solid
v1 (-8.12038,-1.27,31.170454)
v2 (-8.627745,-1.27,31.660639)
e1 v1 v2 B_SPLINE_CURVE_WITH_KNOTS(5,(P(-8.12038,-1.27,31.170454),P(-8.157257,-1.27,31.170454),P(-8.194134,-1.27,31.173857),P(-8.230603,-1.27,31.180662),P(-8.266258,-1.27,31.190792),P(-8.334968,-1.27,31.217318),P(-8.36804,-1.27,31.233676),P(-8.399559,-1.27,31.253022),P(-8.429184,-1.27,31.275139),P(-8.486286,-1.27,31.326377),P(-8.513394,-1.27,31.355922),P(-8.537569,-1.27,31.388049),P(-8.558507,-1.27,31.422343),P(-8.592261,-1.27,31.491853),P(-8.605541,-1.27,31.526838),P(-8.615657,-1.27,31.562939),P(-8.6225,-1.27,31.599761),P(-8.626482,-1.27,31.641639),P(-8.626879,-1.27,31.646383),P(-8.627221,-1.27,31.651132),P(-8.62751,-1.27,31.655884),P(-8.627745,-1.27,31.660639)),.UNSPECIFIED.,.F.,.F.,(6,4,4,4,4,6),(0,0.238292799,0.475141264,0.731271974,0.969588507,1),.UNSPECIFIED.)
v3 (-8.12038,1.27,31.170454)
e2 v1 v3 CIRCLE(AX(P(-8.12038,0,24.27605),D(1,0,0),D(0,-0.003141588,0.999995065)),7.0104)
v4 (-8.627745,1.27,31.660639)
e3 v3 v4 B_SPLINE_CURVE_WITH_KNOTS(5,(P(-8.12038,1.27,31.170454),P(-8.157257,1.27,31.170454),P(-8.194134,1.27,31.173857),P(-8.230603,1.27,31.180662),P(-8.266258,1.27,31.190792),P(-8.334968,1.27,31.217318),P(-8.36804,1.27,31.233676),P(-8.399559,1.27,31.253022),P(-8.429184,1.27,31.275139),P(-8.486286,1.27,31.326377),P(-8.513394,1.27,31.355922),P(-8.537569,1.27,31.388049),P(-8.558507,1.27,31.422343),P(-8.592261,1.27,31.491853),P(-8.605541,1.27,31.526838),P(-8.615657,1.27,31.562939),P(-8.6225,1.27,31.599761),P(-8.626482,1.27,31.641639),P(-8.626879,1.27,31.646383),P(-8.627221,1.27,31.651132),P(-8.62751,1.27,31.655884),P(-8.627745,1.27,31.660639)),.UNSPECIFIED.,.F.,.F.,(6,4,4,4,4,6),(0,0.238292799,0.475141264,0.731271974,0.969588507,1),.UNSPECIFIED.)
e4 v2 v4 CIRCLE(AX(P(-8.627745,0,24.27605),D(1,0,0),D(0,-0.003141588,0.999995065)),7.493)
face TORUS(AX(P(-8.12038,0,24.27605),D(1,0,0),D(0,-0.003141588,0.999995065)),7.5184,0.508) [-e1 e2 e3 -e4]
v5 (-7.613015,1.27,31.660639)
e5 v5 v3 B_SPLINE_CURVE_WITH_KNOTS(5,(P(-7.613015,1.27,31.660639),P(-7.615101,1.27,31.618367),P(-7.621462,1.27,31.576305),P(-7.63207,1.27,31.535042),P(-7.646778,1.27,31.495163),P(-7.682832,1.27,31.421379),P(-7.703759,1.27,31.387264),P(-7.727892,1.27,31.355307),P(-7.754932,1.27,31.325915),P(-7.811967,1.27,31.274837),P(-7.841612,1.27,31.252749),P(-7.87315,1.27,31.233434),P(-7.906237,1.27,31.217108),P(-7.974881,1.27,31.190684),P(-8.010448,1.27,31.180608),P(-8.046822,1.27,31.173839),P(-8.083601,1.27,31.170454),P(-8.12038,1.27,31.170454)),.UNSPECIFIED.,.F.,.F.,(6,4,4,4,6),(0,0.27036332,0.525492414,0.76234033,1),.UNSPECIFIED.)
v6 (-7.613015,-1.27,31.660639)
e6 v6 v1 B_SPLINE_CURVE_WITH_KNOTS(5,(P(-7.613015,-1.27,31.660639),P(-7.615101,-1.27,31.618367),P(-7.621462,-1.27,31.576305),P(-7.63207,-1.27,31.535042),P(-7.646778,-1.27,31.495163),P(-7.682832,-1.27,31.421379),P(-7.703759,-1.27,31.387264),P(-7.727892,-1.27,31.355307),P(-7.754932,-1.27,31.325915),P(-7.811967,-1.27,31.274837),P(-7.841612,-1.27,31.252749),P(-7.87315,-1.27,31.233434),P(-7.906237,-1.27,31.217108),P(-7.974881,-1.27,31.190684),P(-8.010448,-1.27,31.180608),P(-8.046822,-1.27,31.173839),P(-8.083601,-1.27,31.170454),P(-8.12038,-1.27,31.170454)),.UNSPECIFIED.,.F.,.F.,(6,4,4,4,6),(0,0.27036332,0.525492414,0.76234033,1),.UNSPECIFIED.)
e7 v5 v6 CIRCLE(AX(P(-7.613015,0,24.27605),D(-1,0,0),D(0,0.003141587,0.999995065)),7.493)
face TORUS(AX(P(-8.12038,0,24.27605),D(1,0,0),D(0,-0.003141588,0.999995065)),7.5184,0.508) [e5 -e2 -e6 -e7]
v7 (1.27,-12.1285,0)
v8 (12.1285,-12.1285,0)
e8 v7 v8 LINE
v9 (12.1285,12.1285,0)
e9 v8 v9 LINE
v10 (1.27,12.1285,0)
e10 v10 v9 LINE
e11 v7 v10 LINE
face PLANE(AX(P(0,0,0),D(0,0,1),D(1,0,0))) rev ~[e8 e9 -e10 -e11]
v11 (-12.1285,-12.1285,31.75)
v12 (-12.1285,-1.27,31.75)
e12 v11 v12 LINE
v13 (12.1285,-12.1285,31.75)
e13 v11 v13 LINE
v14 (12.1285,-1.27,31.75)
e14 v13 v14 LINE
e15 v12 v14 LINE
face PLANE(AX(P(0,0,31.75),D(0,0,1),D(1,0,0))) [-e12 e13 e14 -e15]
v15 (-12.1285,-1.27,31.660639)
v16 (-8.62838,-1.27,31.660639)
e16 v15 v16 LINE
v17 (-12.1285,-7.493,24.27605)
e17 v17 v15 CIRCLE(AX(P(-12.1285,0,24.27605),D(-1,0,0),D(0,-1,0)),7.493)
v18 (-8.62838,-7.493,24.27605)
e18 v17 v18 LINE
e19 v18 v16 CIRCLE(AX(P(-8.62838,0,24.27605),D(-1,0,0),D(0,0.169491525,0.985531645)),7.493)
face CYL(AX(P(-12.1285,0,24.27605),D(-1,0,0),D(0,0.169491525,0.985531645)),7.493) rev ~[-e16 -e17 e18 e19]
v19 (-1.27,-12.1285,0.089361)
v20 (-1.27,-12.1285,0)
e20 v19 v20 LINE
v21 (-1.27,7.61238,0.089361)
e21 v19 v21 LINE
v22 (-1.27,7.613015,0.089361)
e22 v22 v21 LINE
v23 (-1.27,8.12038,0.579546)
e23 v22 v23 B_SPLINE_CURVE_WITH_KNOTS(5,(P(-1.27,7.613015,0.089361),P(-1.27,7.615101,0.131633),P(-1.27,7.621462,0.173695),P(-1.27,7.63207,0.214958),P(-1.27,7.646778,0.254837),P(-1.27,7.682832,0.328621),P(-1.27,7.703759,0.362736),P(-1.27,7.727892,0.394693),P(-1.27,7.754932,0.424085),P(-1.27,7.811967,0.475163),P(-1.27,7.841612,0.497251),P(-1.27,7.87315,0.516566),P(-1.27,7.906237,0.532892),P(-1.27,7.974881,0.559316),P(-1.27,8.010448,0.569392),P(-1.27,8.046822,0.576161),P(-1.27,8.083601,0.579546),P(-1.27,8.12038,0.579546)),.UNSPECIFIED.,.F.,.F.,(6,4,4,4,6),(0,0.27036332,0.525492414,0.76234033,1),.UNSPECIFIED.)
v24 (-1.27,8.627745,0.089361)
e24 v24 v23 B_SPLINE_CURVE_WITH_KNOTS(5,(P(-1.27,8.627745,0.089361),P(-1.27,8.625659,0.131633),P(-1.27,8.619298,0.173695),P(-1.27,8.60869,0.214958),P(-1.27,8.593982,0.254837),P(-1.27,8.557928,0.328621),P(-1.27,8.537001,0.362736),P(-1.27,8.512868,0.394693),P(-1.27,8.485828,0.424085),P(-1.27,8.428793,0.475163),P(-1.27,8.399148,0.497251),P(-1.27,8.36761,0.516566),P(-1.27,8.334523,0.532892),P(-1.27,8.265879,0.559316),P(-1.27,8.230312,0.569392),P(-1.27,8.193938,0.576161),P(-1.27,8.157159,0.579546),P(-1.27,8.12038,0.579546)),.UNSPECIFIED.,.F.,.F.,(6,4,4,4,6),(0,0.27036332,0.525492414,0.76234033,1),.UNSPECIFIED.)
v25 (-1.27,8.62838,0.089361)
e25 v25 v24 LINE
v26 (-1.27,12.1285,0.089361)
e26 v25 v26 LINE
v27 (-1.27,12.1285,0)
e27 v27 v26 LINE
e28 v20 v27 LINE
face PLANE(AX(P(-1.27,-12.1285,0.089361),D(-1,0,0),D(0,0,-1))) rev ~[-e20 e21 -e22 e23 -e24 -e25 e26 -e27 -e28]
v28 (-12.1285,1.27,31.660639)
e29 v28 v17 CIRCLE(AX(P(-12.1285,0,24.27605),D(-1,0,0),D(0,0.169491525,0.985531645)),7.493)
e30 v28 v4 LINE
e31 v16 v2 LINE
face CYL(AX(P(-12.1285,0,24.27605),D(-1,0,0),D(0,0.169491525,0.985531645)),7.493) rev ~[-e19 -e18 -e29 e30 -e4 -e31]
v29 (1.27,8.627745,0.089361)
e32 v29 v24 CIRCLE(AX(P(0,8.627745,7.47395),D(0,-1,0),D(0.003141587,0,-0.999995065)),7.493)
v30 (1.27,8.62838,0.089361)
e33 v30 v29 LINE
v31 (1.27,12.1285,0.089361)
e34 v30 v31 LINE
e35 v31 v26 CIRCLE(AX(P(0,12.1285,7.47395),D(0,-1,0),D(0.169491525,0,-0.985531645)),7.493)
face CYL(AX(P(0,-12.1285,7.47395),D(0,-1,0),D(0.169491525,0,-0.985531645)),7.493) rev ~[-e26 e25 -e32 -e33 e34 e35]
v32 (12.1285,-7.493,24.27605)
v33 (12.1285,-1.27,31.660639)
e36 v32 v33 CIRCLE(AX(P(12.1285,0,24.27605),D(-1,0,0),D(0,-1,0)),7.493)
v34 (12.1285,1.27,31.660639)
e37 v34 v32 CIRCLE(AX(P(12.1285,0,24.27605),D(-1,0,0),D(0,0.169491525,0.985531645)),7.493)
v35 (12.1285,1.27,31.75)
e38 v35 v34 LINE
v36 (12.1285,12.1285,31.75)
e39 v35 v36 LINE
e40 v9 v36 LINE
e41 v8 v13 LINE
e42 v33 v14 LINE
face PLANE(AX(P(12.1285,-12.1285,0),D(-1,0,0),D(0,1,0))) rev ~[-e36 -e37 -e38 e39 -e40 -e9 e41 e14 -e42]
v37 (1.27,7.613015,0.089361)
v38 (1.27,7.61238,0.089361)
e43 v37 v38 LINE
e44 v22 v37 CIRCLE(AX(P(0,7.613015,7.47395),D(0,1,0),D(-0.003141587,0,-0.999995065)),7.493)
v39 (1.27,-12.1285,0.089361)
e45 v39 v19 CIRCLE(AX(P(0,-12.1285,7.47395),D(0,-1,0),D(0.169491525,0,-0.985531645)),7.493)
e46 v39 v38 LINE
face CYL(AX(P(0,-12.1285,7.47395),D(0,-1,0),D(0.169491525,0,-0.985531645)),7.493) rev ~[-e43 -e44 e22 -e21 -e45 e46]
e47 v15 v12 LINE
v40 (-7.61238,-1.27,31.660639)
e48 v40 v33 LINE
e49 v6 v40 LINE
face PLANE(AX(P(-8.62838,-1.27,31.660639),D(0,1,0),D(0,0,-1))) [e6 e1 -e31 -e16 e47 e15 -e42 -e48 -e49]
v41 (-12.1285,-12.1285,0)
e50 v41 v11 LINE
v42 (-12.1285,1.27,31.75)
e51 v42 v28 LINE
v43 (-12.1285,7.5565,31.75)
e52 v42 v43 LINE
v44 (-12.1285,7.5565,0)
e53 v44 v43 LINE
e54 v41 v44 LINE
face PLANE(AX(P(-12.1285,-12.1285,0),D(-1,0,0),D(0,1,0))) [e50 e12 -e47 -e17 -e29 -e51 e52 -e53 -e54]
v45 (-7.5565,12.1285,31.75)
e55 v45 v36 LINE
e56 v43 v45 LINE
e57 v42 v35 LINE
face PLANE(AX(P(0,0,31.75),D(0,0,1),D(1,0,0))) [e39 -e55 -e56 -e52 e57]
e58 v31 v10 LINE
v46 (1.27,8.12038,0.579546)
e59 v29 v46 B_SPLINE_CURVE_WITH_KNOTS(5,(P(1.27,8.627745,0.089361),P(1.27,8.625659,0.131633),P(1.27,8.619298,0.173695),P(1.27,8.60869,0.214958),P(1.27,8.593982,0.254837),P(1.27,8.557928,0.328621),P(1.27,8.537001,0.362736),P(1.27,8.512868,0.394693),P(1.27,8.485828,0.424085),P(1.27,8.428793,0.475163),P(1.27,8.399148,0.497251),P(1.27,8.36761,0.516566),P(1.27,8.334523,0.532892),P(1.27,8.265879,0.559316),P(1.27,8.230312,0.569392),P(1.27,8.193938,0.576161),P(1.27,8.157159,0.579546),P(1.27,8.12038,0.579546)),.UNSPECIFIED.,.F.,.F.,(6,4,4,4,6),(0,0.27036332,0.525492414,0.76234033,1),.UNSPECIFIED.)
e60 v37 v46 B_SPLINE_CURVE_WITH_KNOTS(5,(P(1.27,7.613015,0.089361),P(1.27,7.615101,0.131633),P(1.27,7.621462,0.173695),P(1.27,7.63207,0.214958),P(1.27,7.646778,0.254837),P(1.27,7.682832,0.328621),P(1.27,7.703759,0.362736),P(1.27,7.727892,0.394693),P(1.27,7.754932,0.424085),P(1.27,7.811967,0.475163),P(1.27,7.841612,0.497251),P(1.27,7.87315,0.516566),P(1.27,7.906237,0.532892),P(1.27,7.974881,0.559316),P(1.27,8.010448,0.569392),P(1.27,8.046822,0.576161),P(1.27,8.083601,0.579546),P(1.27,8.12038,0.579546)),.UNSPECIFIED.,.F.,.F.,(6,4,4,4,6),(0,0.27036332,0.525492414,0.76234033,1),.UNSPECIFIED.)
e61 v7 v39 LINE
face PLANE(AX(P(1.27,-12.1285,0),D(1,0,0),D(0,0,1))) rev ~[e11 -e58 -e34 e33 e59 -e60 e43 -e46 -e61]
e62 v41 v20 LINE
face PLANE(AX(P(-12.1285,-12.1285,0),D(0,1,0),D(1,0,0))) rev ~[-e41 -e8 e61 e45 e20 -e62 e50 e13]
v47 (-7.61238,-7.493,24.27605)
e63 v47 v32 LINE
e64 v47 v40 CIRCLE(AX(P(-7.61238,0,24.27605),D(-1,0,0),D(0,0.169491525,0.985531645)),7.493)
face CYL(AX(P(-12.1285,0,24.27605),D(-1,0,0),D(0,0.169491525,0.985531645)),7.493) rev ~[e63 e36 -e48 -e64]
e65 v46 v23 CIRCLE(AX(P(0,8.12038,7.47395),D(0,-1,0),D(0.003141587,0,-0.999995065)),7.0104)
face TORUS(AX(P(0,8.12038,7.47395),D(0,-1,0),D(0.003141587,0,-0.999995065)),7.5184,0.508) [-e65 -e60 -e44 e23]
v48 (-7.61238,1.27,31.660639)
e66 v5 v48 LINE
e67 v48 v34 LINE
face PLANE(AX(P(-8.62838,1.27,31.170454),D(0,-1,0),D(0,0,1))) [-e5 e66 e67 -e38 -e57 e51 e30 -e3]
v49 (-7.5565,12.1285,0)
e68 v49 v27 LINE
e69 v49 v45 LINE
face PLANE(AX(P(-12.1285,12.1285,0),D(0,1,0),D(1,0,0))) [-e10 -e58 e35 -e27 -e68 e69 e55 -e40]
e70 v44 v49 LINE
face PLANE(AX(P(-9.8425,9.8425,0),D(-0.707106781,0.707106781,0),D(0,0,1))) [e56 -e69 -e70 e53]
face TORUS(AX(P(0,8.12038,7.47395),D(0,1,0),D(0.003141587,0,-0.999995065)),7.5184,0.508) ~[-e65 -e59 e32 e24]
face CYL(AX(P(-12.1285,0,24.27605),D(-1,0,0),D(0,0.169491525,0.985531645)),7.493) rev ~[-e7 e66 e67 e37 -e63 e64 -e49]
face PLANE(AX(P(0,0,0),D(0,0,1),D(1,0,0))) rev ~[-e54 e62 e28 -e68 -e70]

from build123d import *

# Parameters (mm, degrees)
F0_W          = 24.257
F0_H          = 24.257
F1_DEPTH      = 31.75
F3_DEPTH      = 25.4
F5_DEPTH      = 25.4
F9_DEPTH      = 1.016
F11_DEPTH     = 1.016
F12_T4_ANGLE  = 359.64
F12_S5_R      = 7.493
F12_T6_DEPTH  = 13
F12_T10_ANGLE = 359.64
F12_S11_R     = 7.493
F12_T12_DEPTH = 13
F12_T16_ANGLE = 359.64
F12_S17_R     = 7.493
F12_T18_DEPTH = 14
F12_T22_ANGLE = 359.64
F12_S23_R     = 7.493
F12_T24_DEPTH = 14
F13_SIZE      = 4.572


# Not quite as in the source:
# - a fillet or chamfer that OpenCascade refuses, or shapes differently, is made with other operations: its cross-section is extruded or revolved along the edge and cut away or added


with BuildPart() as f1:
    # F0 (on Top) → F1 (new body)
    with BuildSketch(Plane.XY):
        Rectangle(F0_W, F0_H)
    extrude(amount=F1_DEPTH)

    # F2 (on face) → F3 (cut)
    with BuildSketch(Plane.XZ.offset(12.1285)):
        with BuildLine():
            Line((1.27, 0), (1.27, 0.0893613859))
            ThreePointArc((1.27, 0.0893613859), (0, 14.96695), (-1.27, 0.0893613859))
            Line((-1.27, 0.0893613859), (-1.27, 0))
            Line((-1.27, 0), (1.27, 0))
        make_face()
    extrude(amount=-F3_DEPTH, mode=Mode.SUBTRACT)

    # F4 (on face) → F5 (cut)
    with BuildSketch(Plane(origin=(-12.1285, 0, 0), x_dir=(0, -1, 0), z_dir=(-1, 0, 0))):
        with BuildLine():
            ThreePointArc((-1.27, 31.6606386141), (-4.8285059283, 18.5462524905), (7.493, 24.27605))
            ThreePointArc((7.493, 24.27605), (5.7297975095, 29.1045559283), (1.27, 31.6606386141))
            ThreePointArc((1.27, 31.6606386141), (0.9030893061, 31.7144287686), (0.5339666633, 31.75))
            Line((0.5339666633, 31.75), (-0.5339666633, 31.75))
            ThreePointArc((-0.5339666633, 31.75), (-0.9030893061, 31.7144287686), (-1.27, 31.6606386141))
        make_face()
        with BuildLine():
            ThreePointArc((0.5339666633, 31.75), (0.9030893061, 31.7144287686), (1.27, 31.6606386141))
            Line((1.27, 31.6606386141), (1.27, 31.75))
            Line((1.27, 31.75), (0.5339666633, 31.75))
        make_face()
        with BuildLine():
            Line((-1.27, 31.75), (-1.27, 31.6606386141))
            ThreePointArc((-1.27, 31.6606386141), (-0.9030893061, 31.7144287686), (-0.5339666633, 31.75))
            Line((-0.5339666633, 31.75), (-1.27, 31.75))
        make_face()
        with BuildLine():
            Line((-0.5339666633, 31.75), (0.5339666633, 31.75))
            ThreePointArc((0.5339666633, 31.75), (0, 31.76905), (-0.5339666633, 31.75))
        make_face()
    extrude(amount=-F5_DEPTH, mode=Mode.SUBTRACT)

    # F8 (on offset) → F9 (join)
    with BuildSketch(Plane(origin=(-8.62838, 0, 0), x_dir=(0, -1, 0), z_dir=(-1, 0, 0))):
        with BuildLine():
            Line((-1.27, 31.1704541193), (-1.27, 31.6606386141))
            ThreePointArc((-1.27, 31.6606386141), (0, 16.78305), (1.27, 31.6606386141))
            Line((1.27, 31.6606386141), (1.27, 31.1704541193))
            ThreePointArc((1.27, 31.1704541193), (0, 17.26565), (-1.27, 31.1704541193))
        make_face()
    extrude(amount=-F9_DEPTH)

    # F10 (on offset) → F11 (join)
    with BuildSketch(Plane(origin=(0, 8.62838, 0), x_dir=(-1, 0, 0), z_dir=(0, 1, 0))):
        with BuildLine():
            ThreePointArc((1.27, 0.0893613859), (0, 14.96695), (-1.27, 0.0893613859))
            Line((-1.27, 0.0893613859), (-1.27, 0.5795458807))
            ThreePointArc((-1.27, 0.5795458807), (0, 14.48435), (1.27, 0.5795458807))
            Line((1.27, 0.5795458807), (1.27, 0.0893613859))
        make_face()
    extrude(amount=-F11_DEPTH)

    # F12: fillet of radius 0.508 on 4 edges, made by hand


with BuildPart() as f12_tool2:
    # F12_s3 → F12_t4 (revolve)
    with BuildSketch(Plane(origin=(0.0234799519, 0, 7.37647e-05), x_dir=(0, 1, 0), z_dir=(-0.9999950652, 0, -0.0031415875))):
        with BuildLine():
            ThreePointArc((8.62838, 0.0444868824), (8.4795902448, -0.3147233624), (8.12038, -0.4635131176))
            Line((8.12038, -0.4635131176), (8.62838, -0.4635131176))
            Line((8.62838, -0.4635131176), (8.62838, 0.0444868824))
        make_face()
    revolve(axis=Axis((0, 8.62838, 7.47395), (0, -1, 0)), revolution_arc=F12_T4_ANGLE)

    # F12_s5 → F12_t6 (intersect, symmetric)
    with BuildSketch(Plane.XZ.offset(-8.2)):
        with Locations((0, 7.47395)):
            Circle(F12_S5_R)
    extrude(amount=F12_T6_DEPTH, both=True, mode=Mode.INTERSECT)


with BuildPart() as f1_1:
    add(f1.part)

    # F12_t1: cut F12_tool2
    add(f12_tool2.part, mode=Mode.SUBTRACT)


with BuildPart() as f12_tool8:
    # F12_s9 → F12_t10 (revolve)
    with BuildSketch(Plane(origin=(0.0234799519, 0, 7.37647e-05), x_dir=(0, 1, 0), z_dir=(-0.9999950652, 0, -0.0031415875))):
        with BuildLine():
            ThreePointArc((7.61238, 0.0444868824), (7.7611697552, -0.3147233624), (8.12038, -0.4635131176))
            Line((8.12038, -0.4635131176), (7.61238, -0.4635131176))
            Line((7.61238, -0.4635131176), (7.61238, 0.0444868824))
        make_face()
    revolve(axis=Axis((0, 7.61238, 7.47395), (0, -1, 0)), revolution_arc=F12_T10_ANGLE)

    # F12_s11 → F12_t12 (intersect, symmetric)
    with BuildSketch(Plane.XZ.offset(-7.9)):
        with Locations((0, 7.47395)):
            Circle(F12_S11_R)
    extrude(amount=F12_T12_DEPTH, both=True, mode=Mode.INTERSECT)


with BuildPart() as f1_2:
    add(f1_1.part)

    # F12_t7: cut F12_tool8
    add(f12_tool8.part, mode=Mode.SUBTRACT)


with BuildPart() as f12_tool14:
    # F12_s15 → F12_t16 (revolve)
    with BuildSketch(Plane(origin=(0, 0.0762649585, 0.0002395942), x_dir=(1, 0, 0), z_dir=(0, 0.9999950652, 0.0031415875))):
        with BuildLine():
            ThreePointArc((-7.61238, -31.7943302026), (-7.7611697552, -31.4351199578), (-8.12038, -31.2863302026))
            Line((-8.12038, -31.2863302026), (-7.61238, -31.2863302026))
            Line((-7.61238, -31.2863302026), (-7.61238, -31.7943302026))
        make_face()
    revolve(axis=Axis((-7.61238, 0, 24.27605), (1, 0, 0)), revolution_arc=F12_T16_ANGLE)

    # F12_s17 → F12_t18 (intersect, symmetric)
    with BuildSketch(Plane.YZ.offset(-8)):
        with Locations((0, 24.27605)):
            Circle(F12_S17_R)
    extrude(amount=F12_T18_DEPTH, both=True, mode=Mode.INTERSECT)


with BuildPart() as f1_3:
    add(f1_2.part)

    # F12_t13: cut F12_tool14
    add(f12_tool14.part, mode=Mode.SUBTRACT)


with BuildPart() as f12_tool20:
    # F12_s21 → F12_t22 (revolve)
    with BuildSketch(Plane(origin=(0, 0.0762649585, 0.0002395942), x_dir=(1, 0, 0), z_dir=(0, 0.9999950652, 0.0031415875))):
        with BuildLine():
            ThreePointArc((-8.12038, -31.2863302026), (-8.4795902448, -31.4351199578), (-8.62838, -31.7943302026))
            Line((-8.62838, -31.7943302026), (-8.62838, -31.2863302026))
            Line((-8.62838, -31.2863302026), (-8.12038, -31.2863302026))
        make_face()
    revolve(axis=Axis((-8.62838, 0, 24.27605), (1, 0, 0)), revolution_arc=F12_T22_ANGLE)

    # F12_s23 → F12_t24 (intersect, symmetric)
    with BuildSketch(Plane.YZ.offset(-8.4)):
        with Locations((0, 24.27605)):
            Circle(F12_S23_R)
    extrude(amount=F12_T24_DEPTH, both=True, mode=Mode.INTERSECT)


with BuildPart() as f1_4:
    add(f1_3.part)

    # F12_t19: cut F12_tool20
    add(f12_tool20.part, mode=Mode.SUBTRACT)

    # F13
    f13_edges = [f1_4.edges().sort_by_distance(p)[0] for p in [
        (-12.1285, 12.1285, 15.875),
    ]]
    chamfer(f13_edges, length=F13_SIZE)


solid = f1_4.part
